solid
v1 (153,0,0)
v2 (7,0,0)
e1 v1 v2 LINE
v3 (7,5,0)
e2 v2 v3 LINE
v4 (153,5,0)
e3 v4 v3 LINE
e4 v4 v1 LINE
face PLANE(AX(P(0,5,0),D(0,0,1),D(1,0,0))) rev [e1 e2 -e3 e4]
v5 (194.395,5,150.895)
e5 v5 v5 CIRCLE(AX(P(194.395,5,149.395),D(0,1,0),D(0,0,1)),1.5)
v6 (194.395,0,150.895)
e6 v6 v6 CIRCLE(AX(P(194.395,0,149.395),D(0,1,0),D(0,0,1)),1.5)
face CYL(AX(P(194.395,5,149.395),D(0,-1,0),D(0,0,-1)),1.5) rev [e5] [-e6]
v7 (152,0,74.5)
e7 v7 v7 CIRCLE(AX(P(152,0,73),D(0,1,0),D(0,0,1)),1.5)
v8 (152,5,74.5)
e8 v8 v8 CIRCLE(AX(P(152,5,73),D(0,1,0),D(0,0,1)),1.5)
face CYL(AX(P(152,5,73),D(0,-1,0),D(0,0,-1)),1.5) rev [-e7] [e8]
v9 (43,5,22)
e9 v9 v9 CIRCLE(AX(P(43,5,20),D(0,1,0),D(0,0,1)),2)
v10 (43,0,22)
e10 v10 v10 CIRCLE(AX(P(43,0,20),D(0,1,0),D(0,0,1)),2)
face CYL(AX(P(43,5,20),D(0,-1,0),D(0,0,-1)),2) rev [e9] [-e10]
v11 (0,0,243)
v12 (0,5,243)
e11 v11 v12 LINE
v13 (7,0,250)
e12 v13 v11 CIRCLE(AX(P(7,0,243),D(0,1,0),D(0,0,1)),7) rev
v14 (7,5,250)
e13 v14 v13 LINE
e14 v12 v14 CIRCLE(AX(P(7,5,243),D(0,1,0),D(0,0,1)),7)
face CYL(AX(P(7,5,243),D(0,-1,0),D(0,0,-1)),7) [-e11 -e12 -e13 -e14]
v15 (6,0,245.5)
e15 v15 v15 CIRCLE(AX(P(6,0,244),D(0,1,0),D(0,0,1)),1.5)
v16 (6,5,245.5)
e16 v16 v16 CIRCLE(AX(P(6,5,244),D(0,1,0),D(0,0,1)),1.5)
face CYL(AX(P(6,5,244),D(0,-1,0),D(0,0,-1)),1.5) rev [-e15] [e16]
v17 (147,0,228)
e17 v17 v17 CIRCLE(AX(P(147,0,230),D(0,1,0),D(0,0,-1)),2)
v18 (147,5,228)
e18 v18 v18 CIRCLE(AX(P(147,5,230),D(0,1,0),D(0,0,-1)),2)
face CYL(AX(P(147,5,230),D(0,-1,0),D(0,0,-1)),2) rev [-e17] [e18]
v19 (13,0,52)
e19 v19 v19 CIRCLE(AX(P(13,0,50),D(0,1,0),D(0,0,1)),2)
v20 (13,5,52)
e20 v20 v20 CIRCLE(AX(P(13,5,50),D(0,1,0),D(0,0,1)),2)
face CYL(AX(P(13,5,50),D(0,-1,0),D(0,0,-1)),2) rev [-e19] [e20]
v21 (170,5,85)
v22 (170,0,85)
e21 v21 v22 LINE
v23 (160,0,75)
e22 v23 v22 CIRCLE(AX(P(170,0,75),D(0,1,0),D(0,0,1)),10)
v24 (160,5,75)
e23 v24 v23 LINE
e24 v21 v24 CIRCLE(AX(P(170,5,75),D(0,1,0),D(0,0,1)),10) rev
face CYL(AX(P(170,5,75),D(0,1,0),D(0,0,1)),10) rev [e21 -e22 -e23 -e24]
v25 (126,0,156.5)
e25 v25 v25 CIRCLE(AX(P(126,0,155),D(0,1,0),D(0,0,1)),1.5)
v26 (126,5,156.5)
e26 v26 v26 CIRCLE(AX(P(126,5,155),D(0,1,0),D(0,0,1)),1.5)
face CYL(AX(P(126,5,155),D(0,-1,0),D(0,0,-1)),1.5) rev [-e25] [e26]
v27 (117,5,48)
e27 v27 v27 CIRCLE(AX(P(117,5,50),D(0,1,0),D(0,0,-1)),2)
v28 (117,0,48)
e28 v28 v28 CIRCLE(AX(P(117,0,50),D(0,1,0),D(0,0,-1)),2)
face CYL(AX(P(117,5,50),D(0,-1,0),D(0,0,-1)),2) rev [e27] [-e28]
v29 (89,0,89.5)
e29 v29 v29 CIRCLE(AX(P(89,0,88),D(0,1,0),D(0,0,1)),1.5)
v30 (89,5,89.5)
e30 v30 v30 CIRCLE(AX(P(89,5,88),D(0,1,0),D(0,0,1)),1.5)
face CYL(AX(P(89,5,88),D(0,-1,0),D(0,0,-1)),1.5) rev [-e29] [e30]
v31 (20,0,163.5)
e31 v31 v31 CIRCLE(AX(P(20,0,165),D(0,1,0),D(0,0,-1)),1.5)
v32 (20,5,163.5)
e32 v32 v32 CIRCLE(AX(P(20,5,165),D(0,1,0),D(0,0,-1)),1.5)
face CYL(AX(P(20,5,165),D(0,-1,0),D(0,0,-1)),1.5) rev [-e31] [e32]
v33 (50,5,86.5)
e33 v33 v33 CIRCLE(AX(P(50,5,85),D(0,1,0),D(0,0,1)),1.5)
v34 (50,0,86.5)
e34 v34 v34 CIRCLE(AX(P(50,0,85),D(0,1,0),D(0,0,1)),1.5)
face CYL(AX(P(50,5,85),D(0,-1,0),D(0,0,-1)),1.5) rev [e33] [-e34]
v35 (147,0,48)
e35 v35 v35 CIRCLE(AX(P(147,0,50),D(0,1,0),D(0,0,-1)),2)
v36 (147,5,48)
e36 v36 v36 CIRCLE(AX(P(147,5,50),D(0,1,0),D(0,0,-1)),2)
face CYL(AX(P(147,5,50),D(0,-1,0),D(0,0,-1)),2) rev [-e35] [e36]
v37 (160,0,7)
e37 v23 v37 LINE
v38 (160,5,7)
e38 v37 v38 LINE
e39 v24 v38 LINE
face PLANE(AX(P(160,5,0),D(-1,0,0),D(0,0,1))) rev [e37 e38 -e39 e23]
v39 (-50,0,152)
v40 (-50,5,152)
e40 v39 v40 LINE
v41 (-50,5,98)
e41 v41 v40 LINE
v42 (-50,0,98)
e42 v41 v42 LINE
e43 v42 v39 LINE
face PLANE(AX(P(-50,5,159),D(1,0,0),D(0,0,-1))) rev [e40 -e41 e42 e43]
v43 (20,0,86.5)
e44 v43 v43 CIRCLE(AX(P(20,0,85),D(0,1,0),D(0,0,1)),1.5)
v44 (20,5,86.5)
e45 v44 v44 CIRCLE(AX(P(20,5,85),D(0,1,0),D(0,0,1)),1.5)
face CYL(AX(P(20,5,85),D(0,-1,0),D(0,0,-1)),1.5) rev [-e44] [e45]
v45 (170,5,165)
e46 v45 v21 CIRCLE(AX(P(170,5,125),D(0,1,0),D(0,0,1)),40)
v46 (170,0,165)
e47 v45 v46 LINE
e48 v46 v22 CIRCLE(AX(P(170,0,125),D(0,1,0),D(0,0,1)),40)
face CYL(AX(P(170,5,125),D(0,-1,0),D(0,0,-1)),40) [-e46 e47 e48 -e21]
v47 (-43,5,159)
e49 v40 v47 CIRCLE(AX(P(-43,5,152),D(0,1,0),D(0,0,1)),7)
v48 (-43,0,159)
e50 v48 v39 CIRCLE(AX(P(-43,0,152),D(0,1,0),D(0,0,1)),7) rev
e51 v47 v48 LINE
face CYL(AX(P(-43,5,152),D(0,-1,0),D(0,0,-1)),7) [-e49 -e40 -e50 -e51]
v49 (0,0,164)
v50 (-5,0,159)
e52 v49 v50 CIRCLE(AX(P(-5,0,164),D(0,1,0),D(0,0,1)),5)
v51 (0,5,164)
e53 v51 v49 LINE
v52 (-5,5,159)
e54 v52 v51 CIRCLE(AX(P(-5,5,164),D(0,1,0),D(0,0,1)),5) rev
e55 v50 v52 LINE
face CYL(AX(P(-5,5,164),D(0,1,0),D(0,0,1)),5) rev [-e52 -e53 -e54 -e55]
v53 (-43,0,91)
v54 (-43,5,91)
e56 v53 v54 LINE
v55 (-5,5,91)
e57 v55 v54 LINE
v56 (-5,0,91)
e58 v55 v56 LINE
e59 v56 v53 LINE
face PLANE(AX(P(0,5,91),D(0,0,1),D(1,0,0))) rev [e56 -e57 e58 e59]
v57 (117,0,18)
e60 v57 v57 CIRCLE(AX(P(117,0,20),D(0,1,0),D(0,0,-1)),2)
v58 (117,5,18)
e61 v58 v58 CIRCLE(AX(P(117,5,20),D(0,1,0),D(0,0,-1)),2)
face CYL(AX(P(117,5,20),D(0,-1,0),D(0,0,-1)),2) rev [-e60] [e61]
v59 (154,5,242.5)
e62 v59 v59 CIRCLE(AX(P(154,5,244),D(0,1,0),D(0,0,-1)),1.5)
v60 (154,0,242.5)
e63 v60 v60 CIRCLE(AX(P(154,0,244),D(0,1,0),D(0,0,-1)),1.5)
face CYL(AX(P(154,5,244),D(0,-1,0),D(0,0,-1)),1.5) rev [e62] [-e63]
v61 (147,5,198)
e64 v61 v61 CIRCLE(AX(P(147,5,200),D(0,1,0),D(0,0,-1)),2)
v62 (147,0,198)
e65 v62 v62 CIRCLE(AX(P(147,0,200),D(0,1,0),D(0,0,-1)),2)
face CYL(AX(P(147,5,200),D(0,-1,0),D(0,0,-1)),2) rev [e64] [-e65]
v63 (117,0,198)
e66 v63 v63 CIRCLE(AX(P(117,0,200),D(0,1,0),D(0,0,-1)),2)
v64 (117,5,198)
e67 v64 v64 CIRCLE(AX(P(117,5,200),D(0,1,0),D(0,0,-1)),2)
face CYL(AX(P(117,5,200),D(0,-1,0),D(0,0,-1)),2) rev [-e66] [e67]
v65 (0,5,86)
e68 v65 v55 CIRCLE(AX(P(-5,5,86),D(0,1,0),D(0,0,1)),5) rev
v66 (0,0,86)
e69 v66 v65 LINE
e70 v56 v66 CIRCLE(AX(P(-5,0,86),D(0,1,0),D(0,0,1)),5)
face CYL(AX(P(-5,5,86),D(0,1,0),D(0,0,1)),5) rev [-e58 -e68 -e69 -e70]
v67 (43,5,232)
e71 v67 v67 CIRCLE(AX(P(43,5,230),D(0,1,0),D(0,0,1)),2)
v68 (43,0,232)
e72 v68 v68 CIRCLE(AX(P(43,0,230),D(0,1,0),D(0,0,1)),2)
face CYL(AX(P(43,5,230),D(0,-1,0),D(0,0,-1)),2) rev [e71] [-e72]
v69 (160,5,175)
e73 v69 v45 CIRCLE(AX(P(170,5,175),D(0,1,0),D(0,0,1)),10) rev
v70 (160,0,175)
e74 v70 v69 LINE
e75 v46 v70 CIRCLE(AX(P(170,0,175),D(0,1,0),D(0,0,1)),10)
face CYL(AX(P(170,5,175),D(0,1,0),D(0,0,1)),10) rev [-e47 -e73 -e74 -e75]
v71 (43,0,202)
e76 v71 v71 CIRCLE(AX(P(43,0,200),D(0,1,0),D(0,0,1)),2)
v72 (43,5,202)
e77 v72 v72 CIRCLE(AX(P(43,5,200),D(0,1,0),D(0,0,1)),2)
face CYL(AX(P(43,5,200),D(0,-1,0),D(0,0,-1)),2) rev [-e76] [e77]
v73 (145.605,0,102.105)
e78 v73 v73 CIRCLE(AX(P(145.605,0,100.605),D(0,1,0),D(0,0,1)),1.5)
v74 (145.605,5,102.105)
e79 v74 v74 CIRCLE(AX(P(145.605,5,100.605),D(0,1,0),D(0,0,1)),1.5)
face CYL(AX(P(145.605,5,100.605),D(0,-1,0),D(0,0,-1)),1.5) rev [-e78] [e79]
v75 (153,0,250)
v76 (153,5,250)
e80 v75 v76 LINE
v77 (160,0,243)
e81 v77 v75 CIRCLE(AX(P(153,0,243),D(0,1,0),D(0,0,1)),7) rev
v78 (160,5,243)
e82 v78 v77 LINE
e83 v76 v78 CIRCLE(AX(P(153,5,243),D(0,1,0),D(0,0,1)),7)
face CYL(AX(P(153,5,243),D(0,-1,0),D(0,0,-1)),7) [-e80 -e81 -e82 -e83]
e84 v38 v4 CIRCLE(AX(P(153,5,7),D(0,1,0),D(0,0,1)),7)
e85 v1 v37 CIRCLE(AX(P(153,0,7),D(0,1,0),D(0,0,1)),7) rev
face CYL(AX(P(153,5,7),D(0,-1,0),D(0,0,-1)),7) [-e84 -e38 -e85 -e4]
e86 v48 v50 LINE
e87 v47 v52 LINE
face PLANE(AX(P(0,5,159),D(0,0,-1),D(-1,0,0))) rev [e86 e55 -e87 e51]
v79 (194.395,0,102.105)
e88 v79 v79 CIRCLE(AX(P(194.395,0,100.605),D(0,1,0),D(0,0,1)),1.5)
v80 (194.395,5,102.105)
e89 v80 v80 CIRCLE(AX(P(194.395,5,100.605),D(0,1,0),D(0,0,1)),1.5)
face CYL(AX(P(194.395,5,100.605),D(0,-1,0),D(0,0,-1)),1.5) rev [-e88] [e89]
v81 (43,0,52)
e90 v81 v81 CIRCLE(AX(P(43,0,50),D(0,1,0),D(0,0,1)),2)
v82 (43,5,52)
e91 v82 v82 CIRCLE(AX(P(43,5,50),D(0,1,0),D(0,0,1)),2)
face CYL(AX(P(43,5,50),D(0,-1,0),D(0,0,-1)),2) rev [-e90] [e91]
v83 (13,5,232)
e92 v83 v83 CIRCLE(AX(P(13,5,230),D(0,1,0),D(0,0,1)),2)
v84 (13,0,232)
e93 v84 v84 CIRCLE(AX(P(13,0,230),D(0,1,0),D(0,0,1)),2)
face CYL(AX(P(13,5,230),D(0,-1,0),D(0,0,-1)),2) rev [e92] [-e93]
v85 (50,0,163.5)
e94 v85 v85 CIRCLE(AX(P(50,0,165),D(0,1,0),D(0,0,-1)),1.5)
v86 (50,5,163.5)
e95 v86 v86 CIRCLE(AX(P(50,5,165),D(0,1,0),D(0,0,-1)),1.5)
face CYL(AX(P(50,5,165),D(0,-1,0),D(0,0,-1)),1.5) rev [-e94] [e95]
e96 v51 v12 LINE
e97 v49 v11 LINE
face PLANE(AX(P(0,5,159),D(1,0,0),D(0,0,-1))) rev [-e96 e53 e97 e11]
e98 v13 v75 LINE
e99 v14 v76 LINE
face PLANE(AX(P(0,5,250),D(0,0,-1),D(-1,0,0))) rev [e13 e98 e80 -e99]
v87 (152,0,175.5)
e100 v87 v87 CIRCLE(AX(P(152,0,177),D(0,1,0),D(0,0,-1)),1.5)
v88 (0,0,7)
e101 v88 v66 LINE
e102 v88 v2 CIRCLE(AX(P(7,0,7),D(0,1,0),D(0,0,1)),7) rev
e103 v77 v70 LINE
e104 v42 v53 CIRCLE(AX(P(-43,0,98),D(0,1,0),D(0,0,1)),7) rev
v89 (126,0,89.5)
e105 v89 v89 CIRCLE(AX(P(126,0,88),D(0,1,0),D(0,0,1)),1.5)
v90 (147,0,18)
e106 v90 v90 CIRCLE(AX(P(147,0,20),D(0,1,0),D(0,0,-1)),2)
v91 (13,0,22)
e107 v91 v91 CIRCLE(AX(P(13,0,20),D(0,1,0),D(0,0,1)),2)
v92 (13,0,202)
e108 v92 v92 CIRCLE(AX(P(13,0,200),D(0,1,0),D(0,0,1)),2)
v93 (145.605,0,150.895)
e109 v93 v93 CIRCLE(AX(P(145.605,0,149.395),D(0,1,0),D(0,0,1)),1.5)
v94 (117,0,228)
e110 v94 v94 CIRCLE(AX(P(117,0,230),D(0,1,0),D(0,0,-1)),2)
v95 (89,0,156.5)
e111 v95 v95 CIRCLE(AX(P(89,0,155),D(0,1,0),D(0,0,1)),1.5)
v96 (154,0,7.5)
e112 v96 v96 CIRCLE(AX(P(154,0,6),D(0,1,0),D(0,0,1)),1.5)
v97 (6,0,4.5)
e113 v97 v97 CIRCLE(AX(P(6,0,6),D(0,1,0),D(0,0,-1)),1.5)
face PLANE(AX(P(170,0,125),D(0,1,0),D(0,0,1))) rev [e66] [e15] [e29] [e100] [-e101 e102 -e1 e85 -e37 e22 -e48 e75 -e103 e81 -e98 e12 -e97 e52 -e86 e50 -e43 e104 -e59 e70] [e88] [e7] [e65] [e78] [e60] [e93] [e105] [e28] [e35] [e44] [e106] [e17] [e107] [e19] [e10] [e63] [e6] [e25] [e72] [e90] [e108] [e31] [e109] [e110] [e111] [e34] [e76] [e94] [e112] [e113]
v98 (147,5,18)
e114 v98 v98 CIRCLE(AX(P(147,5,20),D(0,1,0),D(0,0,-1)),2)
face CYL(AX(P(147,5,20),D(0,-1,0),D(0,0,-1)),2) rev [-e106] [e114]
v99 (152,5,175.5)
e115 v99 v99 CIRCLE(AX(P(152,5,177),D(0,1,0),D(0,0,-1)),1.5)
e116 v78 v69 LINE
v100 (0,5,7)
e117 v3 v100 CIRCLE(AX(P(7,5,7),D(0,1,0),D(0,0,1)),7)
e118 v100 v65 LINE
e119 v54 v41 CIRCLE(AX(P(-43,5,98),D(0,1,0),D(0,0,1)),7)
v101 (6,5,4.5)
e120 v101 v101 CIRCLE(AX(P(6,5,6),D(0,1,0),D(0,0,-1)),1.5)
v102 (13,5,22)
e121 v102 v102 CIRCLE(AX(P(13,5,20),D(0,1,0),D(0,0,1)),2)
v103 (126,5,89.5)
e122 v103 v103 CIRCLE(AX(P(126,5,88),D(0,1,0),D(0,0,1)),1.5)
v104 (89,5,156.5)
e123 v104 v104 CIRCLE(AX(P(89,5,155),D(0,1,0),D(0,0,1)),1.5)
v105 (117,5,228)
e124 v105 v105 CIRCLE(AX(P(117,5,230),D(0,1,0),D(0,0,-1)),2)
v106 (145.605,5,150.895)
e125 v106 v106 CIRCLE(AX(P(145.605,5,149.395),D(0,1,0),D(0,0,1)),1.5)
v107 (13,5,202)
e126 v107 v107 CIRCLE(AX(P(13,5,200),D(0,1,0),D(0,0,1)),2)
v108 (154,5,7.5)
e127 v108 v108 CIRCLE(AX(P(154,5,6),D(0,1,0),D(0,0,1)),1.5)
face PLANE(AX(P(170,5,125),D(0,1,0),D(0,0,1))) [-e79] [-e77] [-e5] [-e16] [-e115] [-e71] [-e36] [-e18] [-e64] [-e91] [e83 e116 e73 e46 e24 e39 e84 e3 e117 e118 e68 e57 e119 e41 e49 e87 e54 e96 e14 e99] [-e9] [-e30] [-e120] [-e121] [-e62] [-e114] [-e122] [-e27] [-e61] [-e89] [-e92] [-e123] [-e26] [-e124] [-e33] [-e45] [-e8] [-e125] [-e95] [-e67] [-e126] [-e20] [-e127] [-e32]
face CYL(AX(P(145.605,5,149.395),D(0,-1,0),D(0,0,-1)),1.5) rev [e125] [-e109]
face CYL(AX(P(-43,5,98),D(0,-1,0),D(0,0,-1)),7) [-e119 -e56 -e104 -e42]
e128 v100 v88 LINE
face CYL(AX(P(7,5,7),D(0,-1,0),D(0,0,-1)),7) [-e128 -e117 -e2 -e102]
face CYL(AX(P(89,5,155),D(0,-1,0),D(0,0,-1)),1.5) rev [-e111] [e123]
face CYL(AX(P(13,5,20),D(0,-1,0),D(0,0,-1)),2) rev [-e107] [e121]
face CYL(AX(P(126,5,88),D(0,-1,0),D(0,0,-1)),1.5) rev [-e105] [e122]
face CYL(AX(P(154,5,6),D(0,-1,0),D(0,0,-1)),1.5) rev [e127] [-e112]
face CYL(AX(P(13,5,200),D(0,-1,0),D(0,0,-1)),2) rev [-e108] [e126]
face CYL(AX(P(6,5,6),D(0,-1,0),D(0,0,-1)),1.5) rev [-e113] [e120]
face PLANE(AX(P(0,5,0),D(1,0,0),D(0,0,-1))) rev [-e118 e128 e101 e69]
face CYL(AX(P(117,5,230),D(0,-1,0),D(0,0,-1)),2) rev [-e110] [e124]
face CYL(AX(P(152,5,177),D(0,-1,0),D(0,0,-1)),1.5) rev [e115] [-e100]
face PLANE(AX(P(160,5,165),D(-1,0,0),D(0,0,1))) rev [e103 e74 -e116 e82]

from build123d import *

# Parameters (mm, degrees)
SKETCH_1_R      = 1.5
SKETCH_1_R_2    = 2
EXTRUDE_1_DEPTH = 5
FILLET_1_R      = 7
FILLET_4_R      = 5
FILLET_6_R      = 10


with BuildPart() as part:
    # 草图1 → 凸台-拉伸1 (new body)
    with BuildSketch(Plane(origin=(0, 0, 0), x_dir=(1, 0, 0), z_dir=(0, 1, 0))):
        with BuildLine():
            Line((0, 0), (160, 0))
            Line((160, 0), (160, -85))
            Line((160, -85), (170, -85))
            ThreePointArc((170, -85), (210, -125), (170, -165))
            Line((170, -165), (160, -165))
            Line((160, -165), (160, -250))
            Line((160, -250), (0, -250))
            Line((0, -250), (0, -159))
            Line((0, -159), (-50, -159))
            Line((-50, -159), (-50, -91))
            Line((-50, -91), (0, -91))
            Line((0, -91), (0, 0))
        make_face()
        with Locations(Location((154, -6, 0), (0, 0, 270))):
            Circle(SKETCH_1_R, mode=Mode.SUBTRACT)
        with Locations(Location((6, -6, 0), (0, 0, 90))):
            Circle(SKETCH_1_R, mode=Mode.SUBTRACT)
        with Locations(Location((152, -73, 0), (0, 0, 270))):
            Circle(SKETCH_1_R, mode=Mode.SUBTRACT)
        with Locations(Location((152, -177, 0), (0, 0, 90))):
            Circle(SKETCH_1_R, mode=Mode.SUBTRACT)
        with Locations(Location((154, -244, 0), (0, 0, 90))):
            Circle(SKETCH_1_R, mode=Mode.SUBTRACT)
        with Locations(Location((6, -244, 0), (0, 0, 270))):
            Circle(SKETCH_1_R, mode=Mode.SUBTRACT)
        with Locations(Location((50, -85, 0), (0, 0, 270))):
            Circle(SKETCH_1_R, mode=Mode.SUBTRACT)
        with Locations(Location((50, -165, 0), (0, 0, 90))):
            Circle(SKETCH_1_R, mode=Mode.SUBTRACT)
        with Locations(Location((13, -20, 0), (0, 0, 270))):
            Circle(SKETCH_1_R_2, mode=Mode.SUBTRACT)
        with Locations(Location((13, -200, 0), (0, 0, 270))):
            Circle(SKETCH_1_R_2, mode=Mode.SUBTRACT)
        with Locations(Location((20, -85, 0), (0, 0, 270))):
            Circle(SKETCH_1_R, mode=Mode.SUBTRACT)
        with Locations(Location((20, -165, 0), (0, 0, 90))):
            Circle(SKETCH_1_R, mode=Mode.SUBTRACT)
        with Locations(Location((89, -88, 0), (0, 0, 270))):
            Circle(SKETCH_1_R, mode=Mode.SUBTRACT)
        with Locations(Location((126, -88, 0), (0, 0, 270))):
            Circle(SKETCH_1_R, mode=Mode.SUBTRACT)
        with Locations(Location((126, -155, 0), (0, 0, 270))):
            Circle(SKETCH_1_R, mode=Mode.SUBTRACT)
        with Locations(Location((89, -155, 0), (0, 0, 270))):
            Circle(SKETCH_1_R, mode=Mode.SUBTRACT)
        with Locations(Location((43, -200, 0), (0, 0, 270))):
            Circle(SKETCH_1_R_2, mode=Mode.SUBTRACT)
        with Locations(Location((13, -230, 0), (0, 0, 270))):
            Circle(SKETCH_1_R_2, mode=Mode.SUBTRACT)
        with Locations(Location((43, -230, 0), (0, 0, 270))):
            Circle(SKETCH_1_R_2, mode=Mode.SUBTRACT)
        with Locations(Location((117, -230, 0), (0, 0, 90))):
            Circle(SKETCH_1_R_2, mode=Mode.SUBTRACT)
        with Locations(Location((147, -230, 0), (0, 0, 90))):
            Circle(SKETCH_1_R_2, mode=Mode.SUBTRACT)
        with Locations(Location((117, -200, 0), (0, 0, 90))):
            Circle(SKETCH_1_R_2, mode=Mode.SUBTRACT)
        with Locations(Location((147, -200, 0), (0, 0, 90))):
            Circle(SKETCH_1_R_2, mode=Mode.SUBTRACT)
        with Locations(Location((43, -20, 0), (0, 0, 270))):
            Circle(SKETCH_1_R_2, mode=Mode.SUBTRACT)
        with Locations(Location((13, -50, 0), (0, 0, 270))):
            Circle(SKETCH_1_R_2, mode=Mode.SUBTRACT)
        with Locations(Location((43, -50, 0), (0, 0, 270))):
            Circle(SKETCH_1_R_2, mode=Mode.SUBTRACT)
        with Locations(Location((117, -20, 0), (0, 0, 90))):
            Circle(SKETCH_1_R_2, mode=Mode.SUBTRACT)
        with Locations(Location((117, -50, 0), (0, 0, 90))):
            Circle(SKETCH_1_R_2, mode=Mode.SUBTRACT)
        with Locations(Location((147, -50, 0), (0, 0, 90))):
            Circle(SKETCH_1_R_2, mode=Mode.SUBTRACT)
        with Locations(Location((147, -20, 0), (0, 0, 90))):
            Circle(SKETCH_1_R_2, mode=Mode.SUBTRACT)
        with Locations(Location((145.605, -100.605, 0), (0, 0, 270))):
            Circle(SKETCH_1_R, mode=Mode.SUBTRACT)
        with Locations(Location((194.395, -100.605, 0), (0, 0, 270))):
            Circle(SKETCH_1_R, mode=Mode.SUBTRACT)
        with Locations(Location((194.395, -149.395, 0), (0, 0, 270))):
            Circle(SKETCH_1_R, mode=Mode.SUBTRACT)
        with Locations(Location((145.605, -149.395, 0), (0, 0, 270))):
            Circle(SKETCH_1_R, mode=Mode.SUBTRACT)
    extrude(amount=EXTRUDE_1_DEPTH)

    # 圆角1
    fillet_1_edges = [part.edges().sort_by_distance(p)[0] for p in [
        (0, 2.5, 0),
        (160, 2.5, 0),
        (160, 2.5, 250),
        (0, 2.5, 250),
        (-50, 2.5, 159),
        (-50, 2.5, 91),
    ]]
    fillet(fillet_1_edges, radius=FILLET_1_R)

    # 圆角4
    fillet_4_edges = [part.edges().sort_by_distance(p)[0] for p in [
        (0, 2.5, 159),
        (0, 2.5, 91),
    ]]
    fillet(fillet_4_edges, radius=FILLET_4_R)

    # 圆角6
    fillet_6_edges = [part.edges().sort_by_distance(p)[0] for p in [
        (160, 2.5, 85),
        (160, 2.5, 165),
    ]]
    fillet(fillet_6_edges, radius=FILLET_6_R - 0.0001)  # a hair under: the kernel refuses the full size


solid = part.part
